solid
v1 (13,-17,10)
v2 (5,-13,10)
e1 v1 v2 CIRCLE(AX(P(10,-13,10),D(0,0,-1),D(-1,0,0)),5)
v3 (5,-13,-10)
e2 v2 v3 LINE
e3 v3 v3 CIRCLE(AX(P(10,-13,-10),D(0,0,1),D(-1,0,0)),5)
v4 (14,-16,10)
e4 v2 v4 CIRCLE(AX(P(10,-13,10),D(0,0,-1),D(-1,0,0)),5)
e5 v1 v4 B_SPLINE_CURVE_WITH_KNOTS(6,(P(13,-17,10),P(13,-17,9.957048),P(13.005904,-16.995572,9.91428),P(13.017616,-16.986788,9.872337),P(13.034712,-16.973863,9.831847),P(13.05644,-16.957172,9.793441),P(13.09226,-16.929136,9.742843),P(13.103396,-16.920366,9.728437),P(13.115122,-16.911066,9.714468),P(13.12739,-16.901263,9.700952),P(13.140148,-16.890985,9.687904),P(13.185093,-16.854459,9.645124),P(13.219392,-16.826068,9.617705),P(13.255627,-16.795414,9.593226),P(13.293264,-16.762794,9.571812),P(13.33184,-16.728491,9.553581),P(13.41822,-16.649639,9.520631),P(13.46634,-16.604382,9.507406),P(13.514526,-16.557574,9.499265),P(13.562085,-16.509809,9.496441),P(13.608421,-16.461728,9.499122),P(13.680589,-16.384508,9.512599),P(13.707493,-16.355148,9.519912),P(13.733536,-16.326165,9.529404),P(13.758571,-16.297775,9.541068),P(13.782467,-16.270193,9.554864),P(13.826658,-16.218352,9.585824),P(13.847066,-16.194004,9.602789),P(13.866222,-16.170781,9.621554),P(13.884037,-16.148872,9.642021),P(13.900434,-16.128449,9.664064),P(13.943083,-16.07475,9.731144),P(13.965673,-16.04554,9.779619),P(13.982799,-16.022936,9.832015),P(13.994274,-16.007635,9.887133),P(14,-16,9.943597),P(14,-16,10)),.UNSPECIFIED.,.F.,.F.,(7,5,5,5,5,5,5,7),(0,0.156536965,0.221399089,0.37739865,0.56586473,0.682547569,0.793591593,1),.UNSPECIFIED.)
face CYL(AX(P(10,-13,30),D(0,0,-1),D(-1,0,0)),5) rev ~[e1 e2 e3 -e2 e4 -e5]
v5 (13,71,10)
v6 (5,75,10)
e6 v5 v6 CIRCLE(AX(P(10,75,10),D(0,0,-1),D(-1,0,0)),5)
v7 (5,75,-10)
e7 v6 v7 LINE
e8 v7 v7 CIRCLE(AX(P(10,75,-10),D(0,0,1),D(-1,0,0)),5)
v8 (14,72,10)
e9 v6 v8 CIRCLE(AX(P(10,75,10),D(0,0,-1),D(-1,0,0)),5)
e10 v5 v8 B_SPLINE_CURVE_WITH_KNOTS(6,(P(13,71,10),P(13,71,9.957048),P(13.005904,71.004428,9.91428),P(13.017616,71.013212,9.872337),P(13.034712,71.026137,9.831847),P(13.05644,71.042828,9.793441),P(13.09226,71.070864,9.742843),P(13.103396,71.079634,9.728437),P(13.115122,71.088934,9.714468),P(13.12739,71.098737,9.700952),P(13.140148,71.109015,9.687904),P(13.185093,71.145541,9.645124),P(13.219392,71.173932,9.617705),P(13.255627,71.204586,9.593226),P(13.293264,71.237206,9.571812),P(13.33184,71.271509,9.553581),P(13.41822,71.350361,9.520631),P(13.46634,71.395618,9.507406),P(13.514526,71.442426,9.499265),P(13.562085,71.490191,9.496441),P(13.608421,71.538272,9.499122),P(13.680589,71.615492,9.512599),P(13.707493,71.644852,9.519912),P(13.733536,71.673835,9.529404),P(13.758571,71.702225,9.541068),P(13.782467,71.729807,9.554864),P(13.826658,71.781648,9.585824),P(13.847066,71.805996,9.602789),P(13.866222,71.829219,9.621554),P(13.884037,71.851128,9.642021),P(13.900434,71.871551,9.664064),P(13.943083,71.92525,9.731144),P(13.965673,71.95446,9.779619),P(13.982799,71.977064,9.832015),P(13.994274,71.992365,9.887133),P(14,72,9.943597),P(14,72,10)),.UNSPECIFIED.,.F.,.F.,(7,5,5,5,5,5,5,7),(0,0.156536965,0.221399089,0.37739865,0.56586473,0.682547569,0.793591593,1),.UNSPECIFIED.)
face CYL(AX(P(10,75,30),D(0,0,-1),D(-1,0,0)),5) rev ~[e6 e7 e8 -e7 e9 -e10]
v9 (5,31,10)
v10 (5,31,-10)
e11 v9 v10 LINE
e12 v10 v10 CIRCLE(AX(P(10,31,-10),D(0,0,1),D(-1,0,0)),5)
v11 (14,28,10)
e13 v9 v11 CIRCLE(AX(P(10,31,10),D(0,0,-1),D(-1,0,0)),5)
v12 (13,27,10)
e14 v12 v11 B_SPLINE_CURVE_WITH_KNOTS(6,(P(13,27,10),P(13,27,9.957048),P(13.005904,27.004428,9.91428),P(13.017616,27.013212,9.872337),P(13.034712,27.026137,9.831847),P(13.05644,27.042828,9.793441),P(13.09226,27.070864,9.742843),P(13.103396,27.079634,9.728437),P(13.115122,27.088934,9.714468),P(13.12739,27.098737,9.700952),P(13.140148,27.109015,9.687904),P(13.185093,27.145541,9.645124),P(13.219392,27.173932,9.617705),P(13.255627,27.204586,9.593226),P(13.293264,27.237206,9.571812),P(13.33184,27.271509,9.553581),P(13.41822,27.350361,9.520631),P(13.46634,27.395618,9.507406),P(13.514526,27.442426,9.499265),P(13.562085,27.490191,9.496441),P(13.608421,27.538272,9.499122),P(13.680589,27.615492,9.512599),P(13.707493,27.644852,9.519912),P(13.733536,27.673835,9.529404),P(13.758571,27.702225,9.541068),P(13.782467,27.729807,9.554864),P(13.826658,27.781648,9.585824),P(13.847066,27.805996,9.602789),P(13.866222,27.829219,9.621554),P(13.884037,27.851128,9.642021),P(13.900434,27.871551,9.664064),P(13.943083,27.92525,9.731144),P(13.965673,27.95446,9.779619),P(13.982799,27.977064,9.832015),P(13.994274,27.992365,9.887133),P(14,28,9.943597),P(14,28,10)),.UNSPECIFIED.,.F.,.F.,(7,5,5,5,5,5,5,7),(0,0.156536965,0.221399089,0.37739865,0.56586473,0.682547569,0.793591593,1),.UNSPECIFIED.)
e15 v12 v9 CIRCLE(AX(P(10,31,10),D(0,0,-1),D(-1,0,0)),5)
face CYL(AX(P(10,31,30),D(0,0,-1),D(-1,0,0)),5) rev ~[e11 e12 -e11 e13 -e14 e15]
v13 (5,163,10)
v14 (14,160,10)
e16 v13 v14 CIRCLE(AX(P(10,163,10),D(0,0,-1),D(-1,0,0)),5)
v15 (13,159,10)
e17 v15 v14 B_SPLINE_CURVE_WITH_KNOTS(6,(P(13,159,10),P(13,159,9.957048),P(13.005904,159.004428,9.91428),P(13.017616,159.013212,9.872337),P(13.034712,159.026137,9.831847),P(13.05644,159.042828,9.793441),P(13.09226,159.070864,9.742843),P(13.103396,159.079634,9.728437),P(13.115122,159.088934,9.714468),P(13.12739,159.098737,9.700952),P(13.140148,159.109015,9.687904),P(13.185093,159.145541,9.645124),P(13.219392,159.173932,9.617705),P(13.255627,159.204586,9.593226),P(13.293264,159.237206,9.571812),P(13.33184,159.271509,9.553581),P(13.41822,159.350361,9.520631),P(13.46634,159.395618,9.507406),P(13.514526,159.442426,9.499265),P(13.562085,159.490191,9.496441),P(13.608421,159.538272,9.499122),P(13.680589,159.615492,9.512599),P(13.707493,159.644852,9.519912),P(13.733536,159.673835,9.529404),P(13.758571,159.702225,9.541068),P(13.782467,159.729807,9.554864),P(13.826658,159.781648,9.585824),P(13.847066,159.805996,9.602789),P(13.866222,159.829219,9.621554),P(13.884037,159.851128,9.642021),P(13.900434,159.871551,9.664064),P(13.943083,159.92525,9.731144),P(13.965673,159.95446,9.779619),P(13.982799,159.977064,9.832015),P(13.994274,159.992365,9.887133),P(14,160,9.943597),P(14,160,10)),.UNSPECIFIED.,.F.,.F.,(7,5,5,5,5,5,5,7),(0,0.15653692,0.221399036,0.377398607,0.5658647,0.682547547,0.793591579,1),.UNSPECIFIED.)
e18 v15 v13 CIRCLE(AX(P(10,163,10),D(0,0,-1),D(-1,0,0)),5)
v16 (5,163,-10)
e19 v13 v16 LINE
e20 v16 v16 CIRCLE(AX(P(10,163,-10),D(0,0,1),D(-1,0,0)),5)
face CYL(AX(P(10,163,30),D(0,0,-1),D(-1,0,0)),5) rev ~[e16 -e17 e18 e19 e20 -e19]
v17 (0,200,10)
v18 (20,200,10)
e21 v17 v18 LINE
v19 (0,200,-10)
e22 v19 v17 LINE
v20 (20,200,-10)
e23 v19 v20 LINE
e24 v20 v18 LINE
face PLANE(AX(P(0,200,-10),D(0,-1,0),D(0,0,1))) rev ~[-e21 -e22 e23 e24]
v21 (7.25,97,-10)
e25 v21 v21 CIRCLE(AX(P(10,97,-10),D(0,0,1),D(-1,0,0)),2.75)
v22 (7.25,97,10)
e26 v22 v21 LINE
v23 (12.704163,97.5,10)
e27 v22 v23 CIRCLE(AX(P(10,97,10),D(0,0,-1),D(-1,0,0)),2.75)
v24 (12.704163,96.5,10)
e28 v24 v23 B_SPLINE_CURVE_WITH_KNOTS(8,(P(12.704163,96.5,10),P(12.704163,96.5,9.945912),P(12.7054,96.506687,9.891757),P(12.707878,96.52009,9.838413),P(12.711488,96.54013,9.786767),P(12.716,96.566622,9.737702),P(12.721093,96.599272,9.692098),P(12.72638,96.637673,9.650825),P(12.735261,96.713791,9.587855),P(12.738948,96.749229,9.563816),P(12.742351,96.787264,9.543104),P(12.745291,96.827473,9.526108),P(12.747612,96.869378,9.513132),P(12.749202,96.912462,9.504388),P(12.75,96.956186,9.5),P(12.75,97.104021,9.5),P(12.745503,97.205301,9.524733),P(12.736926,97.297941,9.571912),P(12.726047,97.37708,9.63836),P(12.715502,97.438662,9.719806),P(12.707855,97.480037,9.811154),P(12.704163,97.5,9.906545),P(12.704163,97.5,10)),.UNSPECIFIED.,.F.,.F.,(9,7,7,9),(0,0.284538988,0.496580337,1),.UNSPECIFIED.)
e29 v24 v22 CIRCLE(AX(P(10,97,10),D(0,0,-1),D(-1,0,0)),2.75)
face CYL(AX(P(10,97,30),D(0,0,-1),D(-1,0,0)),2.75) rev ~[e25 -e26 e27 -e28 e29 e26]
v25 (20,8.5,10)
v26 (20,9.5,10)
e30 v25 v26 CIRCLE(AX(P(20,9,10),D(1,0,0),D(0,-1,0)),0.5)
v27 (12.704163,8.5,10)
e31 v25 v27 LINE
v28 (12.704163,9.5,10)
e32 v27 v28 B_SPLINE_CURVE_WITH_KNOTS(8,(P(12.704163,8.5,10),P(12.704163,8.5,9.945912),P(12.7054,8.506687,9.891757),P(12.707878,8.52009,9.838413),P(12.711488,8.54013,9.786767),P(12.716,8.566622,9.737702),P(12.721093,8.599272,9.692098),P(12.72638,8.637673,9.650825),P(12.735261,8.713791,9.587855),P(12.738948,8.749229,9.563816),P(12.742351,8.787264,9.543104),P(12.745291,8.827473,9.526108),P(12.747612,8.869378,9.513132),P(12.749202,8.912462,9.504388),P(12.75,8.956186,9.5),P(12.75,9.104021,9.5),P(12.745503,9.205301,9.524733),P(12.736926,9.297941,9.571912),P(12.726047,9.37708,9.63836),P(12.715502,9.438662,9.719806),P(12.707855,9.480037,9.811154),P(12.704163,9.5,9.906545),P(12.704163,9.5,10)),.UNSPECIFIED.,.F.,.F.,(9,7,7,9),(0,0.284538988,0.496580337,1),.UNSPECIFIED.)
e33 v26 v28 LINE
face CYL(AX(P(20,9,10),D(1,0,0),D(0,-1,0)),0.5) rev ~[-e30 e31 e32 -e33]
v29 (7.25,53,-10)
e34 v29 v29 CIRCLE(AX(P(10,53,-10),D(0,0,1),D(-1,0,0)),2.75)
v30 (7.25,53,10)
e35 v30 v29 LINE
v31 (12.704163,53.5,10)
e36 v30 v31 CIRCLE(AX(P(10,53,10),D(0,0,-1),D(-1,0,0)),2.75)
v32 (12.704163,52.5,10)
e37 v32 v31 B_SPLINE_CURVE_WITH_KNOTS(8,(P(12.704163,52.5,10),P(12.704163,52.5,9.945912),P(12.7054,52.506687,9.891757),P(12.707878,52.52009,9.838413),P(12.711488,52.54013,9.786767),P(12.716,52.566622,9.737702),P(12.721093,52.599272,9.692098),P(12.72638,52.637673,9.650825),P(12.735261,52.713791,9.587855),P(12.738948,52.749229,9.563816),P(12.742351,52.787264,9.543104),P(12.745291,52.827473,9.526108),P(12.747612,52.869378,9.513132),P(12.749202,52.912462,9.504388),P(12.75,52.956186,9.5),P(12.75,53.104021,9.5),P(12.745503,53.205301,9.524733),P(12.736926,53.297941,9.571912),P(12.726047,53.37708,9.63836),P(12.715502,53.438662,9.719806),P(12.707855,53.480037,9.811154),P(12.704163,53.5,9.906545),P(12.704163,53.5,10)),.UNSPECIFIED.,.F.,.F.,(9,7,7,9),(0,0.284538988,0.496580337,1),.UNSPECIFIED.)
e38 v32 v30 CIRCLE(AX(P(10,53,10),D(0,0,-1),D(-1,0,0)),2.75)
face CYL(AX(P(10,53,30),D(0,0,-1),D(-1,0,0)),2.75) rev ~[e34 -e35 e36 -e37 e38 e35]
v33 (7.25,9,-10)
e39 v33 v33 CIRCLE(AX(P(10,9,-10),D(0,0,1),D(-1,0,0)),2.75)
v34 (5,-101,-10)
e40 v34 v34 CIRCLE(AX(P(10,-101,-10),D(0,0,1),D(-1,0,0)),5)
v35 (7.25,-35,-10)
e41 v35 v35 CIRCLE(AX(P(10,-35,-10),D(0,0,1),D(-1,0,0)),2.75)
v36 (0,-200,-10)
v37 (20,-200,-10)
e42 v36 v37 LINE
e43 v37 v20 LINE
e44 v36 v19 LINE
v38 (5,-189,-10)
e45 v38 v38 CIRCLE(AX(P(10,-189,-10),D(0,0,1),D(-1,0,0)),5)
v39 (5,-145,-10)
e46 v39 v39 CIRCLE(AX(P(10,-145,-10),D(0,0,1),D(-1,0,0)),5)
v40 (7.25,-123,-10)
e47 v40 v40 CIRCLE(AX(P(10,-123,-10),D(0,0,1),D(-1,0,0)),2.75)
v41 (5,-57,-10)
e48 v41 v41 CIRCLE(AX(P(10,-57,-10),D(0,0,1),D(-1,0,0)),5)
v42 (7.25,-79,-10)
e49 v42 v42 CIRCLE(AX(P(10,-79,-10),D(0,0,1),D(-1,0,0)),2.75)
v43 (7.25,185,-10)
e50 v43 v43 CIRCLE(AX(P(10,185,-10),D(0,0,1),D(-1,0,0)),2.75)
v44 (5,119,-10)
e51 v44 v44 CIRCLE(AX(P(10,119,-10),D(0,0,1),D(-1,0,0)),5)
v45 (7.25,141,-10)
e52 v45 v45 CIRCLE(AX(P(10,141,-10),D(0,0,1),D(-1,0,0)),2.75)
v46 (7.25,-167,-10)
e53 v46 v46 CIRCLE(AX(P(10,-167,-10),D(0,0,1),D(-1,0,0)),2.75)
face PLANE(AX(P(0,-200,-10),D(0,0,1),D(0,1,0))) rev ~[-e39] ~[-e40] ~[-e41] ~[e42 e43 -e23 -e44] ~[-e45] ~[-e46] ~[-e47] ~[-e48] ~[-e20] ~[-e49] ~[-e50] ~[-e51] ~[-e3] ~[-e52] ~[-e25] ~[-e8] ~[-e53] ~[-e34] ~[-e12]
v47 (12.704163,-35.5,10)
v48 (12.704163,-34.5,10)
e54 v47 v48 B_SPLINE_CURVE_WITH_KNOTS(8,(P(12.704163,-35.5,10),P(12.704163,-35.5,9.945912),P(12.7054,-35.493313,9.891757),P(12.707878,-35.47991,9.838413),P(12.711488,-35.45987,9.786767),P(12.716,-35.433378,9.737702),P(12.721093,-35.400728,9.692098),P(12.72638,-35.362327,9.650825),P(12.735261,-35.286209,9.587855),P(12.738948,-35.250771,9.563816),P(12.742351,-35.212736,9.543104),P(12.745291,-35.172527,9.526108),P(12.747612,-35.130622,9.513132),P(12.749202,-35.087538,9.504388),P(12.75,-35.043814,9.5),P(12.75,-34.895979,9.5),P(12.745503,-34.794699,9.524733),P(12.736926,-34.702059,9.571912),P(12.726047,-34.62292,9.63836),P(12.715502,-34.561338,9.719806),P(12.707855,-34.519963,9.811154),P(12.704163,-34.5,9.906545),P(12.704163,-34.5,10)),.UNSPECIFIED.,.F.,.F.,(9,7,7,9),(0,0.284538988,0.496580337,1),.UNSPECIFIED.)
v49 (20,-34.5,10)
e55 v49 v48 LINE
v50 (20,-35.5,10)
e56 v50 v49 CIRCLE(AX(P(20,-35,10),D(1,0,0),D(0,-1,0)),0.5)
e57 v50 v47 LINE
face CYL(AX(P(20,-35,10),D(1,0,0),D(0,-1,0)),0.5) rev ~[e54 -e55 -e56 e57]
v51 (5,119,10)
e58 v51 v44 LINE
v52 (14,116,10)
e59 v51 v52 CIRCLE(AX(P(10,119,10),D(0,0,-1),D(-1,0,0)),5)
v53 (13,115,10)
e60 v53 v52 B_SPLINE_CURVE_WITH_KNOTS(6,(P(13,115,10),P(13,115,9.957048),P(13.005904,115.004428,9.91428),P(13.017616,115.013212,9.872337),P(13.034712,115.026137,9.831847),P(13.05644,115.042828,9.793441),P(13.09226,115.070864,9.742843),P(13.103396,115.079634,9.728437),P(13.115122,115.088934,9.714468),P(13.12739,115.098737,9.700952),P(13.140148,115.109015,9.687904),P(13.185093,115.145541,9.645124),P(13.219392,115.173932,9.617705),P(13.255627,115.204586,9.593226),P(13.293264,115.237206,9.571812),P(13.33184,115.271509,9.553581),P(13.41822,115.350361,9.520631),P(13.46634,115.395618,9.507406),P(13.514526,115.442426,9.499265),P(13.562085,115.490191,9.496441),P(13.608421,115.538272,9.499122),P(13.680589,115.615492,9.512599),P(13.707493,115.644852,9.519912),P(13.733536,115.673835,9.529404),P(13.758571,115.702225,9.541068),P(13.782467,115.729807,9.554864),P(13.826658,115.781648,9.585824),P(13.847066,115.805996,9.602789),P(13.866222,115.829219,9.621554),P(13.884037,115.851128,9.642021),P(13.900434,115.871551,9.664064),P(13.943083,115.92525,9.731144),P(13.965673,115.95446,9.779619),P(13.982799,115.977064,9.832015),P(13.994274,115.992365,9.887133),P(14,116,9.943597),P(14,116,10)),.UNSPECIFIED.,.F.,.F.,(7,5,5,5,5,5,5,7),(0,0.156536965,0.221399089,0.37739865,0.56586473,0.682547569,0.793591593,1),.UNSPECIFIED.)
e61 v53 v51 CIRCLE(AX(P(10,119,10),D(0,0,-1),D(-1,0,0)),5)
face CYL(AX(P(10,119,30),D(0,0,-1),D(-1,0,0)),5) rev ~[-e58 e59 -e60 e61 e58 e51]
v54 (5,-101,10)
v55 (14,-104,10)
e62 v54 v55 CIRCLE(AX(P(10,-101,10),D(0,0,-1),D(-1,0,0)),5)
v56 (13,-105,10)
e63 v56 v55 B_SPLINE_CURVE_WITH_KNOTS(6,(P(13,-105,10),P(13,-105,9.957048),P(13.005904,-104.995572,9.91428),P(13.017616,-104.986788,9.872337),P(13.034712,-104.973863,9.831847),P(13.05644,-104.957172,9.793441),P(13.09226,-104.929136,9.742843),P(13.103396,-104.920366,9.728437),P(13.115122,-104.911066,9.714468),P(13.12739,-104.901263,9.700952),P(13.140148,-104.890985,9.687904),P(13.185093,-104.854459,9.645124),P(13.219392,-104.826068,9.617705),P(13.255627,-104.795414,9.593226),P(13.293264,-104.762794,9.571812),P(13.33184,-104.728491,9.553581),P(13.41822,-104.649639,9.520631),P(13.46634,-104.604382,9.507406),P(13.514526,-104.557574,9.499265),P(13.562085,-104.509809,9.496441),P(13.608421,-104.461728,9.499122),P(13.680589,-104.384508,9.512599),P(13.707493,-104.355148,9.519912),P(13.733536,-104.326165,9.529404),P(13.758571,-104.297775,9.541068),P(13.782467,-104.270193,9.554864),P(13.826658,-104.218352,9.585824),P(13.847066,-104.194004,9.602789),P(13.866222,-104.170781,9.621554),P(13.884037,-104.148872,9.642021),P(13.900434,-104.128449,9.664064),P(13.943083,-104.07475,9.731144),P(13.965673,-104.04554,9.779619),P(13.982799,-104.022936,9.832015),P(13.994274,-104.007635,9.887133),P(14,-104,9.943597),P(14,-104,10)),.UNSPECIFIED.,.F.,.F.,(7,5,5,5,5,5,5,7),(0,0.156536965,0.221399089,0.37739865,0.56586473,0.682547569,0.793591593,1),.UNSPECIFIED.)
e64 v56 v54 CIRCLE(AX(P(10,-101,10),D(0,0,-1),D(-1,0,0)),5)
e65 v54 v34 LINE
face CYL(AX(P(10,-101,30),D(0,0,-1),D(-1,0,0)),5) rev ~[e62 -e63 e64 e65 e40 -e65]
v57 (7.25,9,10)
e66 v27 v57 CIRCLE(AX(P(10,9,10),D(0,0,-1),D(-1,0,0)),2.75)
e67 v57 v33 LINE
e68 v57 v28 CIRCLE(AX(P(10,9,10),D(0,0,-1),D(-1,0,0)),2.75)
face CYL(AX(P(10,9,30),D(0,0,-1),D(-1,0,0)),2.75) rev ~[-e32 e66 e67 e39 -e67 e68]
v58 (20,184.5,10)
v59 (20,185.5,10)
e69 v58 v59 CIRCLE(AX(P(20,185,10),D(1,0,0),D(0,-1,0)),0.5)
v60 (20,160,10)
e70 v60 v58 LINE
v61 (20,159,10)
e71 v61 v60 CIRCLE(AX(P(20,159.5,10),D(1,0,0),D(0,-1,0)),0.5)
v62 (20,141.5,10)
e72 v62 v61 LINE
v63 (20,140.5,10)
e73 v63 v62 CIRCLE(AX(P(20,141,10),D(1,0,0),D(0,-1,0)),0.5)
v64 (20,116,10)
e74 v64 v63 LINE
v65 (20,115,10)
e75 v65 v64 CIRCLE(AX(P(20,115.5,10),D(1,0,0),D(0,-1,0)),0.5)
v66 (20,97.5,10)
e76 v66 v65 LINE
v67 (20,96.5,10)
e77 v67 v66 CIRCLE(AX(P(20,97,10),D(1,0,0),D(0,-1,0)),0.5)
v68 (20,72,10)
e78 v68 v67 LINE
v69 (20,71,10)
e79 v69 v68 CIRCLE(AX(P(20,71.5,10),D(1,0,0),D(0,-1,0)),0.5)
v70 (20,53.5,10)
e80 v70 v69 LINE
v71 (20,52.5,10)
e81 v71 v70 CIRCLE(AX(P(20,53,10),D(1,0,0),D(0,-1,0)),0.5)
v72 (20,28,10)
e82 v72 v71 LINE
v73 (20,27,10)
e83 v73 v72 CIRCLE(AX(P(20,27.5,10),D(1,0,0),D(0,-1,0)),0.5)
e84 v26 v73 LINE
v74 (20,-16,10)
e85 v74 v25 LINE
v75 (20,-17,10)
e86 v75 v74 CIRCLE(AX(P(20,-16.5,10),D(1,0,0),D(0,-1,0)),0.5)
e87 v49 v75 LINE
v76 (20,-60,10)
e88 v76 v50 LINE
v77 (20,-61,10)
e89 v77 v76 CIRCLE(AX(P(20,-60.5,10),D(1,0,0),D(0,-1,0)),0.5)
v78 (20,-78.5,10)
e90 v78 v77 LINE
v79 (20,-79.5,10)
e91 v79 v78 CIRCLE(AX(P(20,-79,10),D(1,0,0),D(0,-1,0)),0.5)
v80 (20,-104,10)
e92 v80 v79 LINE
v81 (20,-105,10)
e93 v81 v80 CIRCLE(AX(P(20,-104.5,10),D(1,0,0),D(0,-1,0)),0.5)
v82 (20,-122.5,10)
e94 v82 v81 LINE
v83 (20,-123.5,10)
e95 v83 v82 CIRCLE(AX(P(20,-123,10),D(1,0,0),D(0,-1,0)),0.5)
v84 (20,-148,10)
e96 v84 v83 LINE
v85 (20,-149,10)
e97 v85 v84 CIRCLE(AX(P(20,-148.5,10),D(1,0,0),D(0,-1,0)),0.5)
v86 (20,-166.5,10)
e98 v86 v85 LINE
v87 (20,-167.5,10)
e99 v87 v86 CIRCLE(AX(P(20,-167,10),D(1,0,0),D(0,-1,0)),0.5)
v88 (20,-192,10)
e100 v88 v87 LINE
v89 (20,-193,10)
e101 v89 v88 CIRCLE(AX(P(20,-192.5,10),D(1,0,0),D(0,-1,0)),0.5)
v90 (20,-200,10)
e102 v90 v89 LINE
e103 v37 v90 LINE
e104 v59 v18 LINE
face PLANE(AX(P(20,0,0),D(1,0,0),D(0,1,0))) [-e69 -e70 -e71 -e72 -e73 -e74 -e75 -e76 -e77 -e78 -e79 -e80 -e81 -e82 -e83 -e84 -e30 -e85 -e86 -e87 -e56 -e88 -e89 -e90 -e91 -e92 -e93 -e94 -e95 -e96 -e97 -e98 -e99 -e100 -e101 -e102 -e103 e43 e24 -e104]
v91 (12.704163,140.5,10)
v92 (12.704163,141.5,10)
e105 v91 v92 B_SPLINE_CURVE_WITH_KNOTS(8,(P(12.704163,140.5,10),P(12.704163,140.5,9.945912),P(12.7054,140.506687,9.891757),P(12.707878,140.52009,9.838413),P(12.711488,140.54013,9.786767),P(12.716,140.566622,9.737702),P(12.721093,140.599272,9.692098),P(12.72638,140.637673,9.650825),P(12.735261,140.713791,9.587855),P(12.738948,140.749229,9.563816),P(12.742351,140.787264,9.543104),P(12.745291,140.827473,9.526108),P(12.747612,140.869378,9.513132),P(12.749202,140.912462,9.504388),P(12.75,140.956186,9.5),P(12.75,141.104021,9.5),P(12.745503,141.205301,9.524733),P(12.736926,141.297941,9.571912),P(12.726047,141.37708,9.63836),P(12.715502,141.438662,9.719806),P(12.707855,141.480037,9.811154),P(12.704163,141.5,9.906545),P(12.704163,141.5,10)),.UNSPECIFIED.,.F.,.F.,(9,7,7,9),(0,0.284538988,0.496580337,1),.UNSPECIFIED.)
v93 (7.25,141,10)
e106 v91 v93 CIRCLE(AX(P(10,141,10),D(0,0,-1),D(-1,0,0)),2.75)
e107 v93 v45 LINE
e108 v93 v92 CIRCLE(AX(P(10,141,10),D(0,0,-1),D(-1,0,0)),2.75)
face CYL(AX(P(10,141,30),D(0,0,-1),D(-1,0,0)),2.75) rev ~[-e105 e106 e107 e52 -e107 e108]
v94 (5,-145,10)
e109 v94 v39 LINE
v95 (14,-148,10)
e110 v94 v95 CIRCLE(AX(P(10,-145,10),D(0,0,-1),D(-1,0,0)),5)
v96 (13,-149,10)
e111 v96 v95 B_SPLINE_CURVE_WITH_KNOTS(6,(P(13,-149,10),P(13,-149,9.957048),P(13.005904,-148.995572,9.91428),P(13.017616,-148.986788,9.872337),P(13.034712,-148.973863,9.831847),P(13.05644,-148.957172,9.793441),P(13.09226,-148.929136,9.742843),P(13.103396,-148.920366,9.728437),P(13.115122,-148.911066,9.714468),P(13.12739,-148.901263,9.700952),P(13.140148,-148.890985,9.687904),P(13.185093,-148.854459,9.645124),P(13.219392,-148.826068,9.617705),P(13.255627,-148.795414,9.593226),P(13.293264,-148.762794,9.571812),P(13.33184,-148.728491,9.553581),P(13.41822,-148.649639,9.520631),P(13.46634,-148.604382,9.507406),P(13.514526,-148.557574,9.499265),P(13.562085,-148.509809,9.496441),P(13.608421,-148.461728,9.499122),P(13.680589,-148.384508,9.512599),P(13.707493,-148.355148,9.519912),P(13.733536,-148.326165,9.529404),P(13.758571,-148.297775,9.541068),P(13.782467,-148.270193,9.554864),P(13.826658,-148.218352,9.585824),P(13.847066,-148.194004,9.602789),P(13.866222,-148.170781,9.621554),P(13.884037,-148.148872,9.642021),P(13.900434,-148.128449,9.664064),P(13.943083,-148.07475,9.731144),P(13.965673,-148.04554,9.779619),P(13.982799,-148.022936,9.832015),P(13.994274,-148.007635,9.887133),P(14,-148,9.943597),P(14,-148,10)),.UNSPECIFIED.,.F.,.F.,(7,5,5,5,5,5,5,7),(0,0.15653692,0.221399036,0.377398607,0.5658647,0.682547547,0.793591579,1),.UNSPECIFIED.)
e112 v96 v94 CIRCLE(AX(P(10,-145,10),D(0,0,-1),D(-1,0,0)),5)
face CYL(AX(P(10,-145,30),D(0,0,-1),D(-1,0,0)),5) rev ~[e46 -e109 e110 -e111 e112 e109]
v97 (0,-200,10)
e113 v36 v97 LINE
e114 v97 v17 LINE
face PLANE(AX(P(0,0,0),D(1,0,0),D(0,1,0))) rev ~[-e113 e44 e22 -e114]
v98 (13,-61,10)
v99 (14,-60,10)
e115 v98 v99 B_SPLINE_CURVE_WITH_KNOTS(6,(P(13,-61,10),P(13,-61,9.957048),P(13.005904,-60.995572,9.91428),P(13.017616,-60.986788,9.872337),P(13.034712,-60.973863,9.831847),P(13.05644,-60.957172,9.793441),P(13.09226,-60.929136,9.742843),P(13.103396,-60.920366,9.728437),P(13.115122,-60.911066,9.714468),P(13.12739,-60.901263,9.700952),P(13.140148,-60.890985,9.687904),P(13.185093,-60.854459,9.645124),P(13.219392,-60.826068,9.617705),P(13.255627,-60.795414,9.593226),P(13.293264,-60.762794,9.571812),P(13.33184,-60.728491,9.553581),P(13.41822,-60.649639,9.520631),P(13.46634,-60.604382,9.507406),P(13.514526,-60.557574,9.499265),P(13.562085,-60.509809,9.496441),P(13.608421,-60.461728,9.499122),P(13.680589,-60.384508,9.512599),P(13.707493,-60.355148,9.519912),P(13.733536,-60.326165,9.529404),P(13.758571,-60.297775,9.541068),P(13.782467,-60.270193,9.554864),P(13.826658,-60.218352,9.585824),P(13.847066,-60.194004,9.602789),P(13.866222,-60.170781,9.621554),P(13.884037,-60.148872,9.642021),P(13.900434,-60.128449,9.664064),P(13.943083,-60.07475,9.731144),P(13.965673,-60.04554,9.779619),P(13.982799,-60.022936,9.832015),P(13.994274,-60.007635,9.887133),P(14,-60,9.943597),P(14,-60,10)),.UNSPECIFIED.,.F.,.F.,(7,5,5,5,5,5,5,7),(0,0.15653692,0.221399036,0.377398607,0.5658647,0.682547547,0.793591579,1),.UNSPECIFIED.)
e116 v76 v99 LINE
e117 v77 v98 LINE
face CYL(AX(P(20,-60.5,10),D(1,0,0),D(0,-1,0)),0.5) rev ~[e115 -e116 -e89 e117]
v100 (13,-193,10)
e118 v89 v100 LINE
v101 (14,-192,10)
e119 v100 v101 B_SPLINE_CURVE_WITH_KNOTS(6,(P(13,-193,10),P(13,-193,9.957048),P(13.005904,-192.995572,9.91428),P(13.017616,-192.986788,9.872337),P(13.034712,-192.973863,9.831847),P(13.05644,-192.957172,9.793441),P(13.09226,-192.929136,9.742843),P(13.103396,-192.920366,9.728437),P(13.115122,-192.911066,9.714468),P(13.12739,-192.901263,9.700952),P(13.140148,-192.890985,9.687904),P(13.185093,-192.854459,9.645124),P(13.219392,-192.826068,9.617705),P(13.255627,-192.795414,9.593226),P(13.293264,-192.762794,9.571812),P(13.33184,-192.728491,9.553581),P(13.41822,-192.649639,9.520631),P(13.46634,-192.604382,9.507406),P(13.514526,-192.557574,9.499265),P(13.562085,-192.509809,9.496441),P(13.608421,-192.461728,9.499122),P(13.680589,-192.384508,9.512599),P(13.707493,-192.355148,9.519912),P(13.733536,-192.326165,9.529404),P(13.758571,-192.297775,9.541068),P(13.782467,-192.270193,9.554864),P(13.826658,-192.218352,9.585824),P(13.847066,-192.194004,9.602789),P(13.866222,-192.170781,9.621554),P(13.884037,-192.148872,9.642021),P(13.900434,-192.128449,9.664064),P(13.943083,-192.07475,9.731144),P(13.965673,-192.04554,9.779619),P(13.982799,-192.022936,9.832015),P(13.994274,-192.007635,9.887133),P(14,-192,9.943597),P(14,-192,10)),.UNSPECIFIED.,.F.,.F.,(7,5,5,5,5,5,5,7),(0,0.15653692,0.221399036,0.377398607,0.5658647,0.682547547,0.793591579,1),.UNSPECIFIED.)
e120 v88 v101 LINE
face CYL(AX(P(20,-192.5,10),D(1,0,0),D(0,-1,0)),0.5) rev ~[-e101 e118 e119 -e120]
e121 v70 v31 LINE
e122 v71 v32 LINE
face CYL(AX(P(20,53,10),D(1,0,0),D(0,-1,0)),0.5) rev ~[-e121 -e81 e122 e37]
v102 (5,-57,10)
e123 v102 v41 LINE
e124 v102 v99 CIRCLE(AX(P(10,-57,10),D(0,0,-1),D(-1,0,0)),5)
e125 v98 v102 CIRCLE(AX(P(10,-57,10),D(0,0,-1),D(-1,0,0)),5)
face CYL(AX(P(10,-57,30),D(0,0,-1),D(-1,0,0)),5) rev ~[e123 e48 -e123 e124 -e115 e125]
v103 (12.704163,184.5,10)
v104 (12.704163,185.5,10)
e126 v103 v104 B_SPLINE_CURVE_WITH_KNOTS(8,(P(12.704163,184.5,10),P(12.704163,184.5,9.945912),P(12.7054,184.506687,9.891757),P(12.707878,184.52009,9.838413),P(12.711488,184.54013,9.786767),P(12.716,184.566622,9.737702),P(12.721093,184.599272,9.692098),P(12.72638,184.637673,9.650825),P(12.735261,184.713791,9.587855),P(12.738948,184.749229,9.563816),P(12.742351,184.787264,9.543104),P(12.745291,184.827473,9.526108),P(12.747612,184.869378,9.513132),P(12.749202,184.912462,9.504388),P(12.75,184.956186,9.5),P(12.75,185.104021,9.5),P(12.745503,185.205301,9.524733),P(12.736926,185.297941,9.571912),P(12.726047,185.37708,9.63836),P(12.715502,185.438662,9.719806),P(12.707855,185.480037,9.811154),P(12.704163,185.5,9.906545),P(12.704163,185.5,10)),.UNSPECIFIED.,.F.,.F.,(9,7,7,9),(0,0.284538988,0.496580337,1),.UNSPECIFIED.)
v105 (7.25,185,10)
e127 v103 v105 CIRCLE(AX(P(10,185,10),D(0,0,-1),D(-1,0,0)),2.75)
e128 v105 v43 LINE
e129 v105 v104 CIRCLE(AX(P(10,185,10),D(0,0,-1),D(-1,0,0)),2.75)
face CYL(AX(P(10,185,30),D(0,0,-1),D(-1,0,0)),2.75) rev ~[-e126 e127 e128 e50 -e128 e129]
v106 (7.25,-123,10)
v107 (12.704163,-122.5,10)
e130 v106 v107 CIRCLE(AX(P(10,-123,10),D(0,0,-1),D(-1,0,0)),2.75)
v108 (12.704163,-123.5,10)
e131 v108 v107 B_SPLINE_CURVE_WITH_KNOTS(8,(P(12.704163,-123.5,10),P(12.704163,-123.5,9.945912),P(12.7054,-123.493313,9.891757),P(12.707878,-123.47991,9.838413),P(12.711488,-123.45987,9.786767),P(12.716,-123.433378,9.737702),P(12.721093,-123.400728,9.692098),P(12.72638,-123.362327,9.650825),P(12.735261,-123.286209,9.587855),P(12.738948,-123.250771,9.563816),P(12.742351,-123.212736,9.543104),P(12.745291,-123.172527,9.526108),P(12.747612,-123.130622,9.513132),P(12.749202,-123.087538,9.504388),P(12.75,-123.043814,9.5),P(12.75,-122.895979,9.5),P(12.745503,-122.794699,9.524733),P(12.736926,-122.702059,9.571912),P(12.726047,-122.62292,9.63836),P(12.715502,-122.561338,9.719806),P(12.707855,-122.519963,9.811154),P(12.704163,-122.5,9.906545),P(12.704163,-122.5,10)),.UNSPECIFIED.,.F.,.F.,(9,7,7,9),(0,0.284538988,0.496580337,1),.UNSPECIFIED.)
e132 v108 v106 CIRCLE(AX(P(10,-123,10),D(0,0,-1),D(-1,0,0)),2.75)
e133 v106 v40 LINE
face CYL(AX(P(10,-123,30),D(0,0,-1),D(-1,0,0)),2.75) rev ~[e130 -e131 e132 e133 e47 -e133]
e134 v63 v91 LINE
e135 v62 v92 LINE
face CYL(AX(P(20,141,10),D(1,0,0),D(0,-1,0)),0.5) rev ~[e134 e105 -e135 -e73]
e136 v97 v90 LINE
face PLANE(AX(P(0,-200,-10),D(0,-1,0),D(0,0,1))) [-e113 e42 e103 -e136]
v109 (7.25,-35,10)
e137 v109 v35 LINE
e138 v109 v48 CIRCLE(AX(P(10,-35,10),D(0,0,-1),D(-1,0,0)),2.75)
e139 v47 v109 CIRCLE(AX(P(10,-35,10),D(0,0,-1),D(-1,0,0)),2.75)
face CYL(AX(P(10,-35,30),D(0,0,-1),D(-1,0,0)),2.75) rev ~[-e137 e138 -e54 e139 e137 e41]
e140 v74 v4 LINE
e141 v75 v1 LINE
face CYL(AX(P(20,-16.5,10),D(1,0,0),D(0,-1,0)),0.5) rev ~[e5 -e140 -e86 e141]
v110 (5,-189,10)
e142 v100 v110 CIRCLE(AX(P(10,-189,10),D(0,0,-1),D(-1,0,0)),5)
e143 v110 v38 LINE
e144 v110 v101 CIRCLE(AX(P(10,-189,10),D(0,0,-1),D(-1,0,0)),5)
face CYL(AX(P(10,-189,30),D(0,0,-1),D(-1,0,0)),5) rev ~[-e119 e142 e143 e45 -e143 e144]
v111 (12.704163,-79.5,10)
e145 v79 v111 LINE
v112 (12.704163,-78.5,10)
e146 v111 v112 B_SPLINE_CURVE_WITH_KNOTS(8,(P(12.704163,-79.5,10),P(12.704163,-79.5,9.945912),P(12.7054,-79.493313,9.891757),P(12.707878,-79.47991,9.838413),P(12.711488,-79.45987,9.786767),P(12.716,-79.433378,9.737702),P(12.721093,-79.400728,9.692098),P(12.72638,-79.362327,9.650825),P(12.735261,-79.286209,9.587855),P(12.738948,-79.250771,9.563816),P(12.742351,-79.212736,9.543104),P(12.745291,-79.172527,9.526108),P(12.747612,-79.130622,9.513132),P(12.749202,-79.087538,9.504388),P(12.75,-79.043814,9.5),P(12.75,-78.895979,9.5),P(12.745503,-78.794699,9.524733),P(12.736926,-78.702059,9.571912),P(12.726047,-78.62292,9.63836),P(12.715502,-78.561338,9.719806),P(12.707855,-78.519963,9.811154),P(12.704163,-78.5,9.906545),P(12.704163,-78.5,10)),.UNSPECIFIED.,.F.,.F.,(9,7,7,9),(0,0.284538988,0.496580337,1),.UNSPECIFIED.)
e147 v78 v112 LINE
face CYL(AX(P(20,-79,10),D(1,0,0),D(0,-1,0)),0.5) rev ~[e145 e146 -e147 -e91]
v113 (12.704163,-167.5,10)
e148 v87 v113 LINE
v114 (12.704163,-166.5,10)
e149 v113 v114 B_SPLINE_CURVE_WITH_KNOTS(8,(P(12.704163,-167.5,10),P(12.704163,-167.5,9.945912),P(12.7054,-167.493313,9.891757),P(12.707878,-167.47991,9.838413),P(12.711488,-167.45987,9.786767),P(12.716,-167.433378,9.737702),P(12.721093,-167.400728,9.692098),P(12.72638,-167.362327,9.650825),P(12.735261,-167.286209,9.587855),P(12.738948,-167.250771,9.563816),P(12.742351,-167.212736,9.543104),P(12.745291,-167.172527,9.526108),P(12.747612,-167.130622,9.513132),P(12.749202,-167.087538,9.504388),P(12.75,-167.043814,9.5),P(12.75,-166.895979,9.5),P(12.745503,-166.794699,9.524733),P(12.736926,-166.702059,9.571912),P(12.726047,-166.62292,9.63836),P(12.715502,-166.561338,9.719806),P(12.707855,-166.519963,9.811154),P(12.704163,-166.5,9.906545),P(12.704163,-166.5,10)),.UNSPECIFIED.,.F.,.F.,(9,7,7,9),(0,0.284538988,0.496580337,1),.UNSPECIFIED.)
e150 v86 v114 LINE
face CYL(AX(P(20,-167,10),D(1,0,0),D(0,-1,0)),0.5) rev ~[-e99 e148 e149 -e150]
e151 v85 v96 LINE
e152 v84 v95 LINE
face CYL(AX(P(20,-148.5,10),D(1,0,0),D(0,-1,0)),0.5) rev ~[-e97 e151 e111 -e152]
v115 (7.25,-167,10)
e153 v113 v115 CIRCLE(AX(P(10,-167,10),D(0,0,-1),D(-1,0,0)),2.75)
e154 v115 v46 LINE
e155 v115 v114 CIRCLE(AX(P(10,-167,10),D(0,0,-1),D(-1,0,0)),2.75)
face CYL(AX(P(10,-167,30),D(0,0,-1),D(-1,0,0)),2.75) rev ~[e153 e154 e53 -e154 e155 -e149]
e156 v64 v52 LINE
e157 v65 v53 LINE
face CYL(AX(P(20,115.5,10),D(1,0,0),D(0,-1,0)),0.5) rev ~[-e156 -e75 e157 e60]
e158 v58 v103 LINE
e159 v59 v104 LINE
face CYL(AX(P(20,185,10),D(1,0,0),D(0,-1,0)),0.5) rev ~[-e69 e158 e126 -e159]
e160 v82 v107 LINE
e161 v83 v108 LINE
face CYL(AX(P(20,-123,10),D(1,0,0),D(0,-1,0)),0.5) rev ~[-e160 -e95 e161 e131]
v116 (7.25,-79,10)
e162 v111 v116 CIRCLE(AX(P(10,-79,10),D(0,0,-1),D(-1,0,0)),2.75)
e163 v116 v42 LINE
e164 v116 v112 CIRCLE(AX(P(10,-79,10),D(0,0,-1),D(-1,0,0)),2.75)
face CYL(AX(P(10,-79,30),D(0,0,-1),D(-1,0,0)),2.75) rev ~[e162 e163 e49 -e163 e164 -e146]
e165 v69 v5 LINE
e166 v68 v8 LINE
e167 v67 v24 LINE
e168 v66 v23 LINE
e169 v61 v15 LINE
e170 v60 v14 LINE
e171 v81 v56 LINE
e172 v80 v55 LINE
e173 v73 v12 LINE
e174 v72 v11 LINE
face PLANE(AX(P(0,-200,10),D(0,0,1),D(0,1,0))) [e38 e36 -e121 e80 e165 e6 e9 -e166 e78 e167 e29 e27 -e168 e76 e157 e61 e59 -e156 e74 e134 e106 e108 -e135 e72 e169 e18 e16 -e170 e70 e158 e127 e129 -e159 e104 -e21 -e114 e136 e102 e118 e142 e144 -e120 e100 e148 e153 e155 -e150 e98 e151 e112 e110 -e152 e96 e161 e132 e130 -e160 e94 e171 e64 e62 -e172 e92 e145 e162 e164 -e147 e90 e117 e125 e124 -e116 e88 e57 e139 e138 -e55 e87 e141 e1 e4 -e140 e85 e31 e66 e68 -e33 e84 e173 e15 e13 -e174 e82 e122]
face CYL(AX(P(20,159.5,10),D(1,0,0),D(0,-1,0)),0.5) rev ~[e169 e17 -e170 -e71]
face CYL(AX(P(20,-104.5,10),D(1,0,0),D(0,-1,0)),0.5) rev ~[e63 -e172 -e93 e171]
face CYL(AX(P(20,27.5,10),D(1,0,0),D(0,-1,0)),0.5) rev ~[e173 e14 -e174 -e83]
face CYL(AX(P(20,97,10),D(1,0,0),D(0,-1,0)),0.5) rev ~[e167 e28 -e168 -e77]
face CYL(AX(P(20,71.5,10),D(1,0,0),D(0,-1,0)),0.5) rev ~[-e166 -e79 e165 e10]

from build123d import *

# Parameters (mm, degrees)
F0_W     = 400
F0_H     = 20
F1_DEPTH = 20
F3_D     = 5.5
F3_DEPTH = 20
F3_TIP   = 1.6523667023
F5_D     = 10
F5_DEPTH = 20
F5_TIP   = 3.0043030951
F7_DEPTH = 10


# Not quite as in the source:
# - a feature names something its author has since deleted; it is built from what else it names


with BuildPart() as f1:
    # F0 (on Right) → F1 (new body)
    with BuildSketch(Plane.YZ):
        Rectangle(F0_W, F0_H)
    extrude(amount=F1_DEPTH)

    # F3
    with Locations(Plane.XY.offset(10)):
        with Locations((10, 185), (10, 141), (10, 97), (10, -167), (10, -123), (10, -79), (10, -35), (10, 9), (10, 53)):
            Hole(F3_D / 2, depth=F3_DEPTH)
            with Locations((0, 0, -(F3_DEPTH + F3_TIP / 2))):  # 118° drill point
                Cone(0, F3_D / 2, F3_TIP, mode=Mode.SUBTRACT)

    # F5
    with Locations(Plane.XY.offset(10)):
        with Locations((10, 163), (10, 119), (10, 75), (10, -189), (10, -145), (10, -101), (10, -57), (10, -13), (10, 31)):
            Hole(F5_D / 2, depth=F5_DEPTH)
            with Locations((0, 0, -(F5_DEPTH + F5_TIP / 2))):  # 118° drill point
                Cone(0, F5_D / 2, F5_TIP, mode=Mode.SUBTRACT)

    # F6 (on face) → F7 (cut)
    with BuildSketch(Plane.YZ.offset(20)):
        with BuildLine():
            ThreePointArc((71, 10), (71.5, 9.5), (72, 10))
            Line((72, 10), (71, 10))
        make_face()
        with BuildLine():
            ThreePointArc((96.5, 10), (97, 9.5), (97.5, 10))
            Line((97.5, 10), (96.5, 10))
        make_face()
        with BuildLine():
            ThreePointArc((115, 10), (115.5, 9.5), (116, 10))
            Line((116, 10), (115, 10))
        make_face()
        with BuildLine():
            ThreePointArc((140.5, 10), (141, 9.5), (141.5, 10))
            Line((141.5, 10), (140.5, 10))
        make_face()
        with BuildLine():
            ThreePointArc((159, 10), (159.5, 9.5), (160, 10))
            Line((160, 10), (159, 10))
        make_face()
        with BuildLine():
            Line((185.5, 10), (184.5, 10))
            ThreePointArc((184.5, 10), (185, 9.5), (185.5, 10))
        make_face()
        with BuildLine():
            ThreePointArc((52.5, 10), (53, 9.5), (53.5, 10))
            Line((53.5, 10), (52.5, 10))
        make_face()
        with BuildLine():
            ThreePointArc((27, 10), (27.5, 9.5), (28, 10))
            Line((28, 10), (27, 10))
        make_face()
        with BuildLine():
            ThreePointArc((8.5, 10), (9, 9.5), (9.5, 10))
            Line((9.5, 10), (8.5, 10))
        make_face()
        with BuildLine():
            ThreePointArc((-17, 10), (-16.5, 9.5), (-16, 10))
            Line((-16, 10), (-17, 10))
        make_face()
        with BuildLine():
            ThreePointArc((-35.5, 10), (-35, 9.5), (-34.5, 10))
            Line((-34.5, 10), (-35.5, 10))
        make_face()
        with BuildLine():
            Line((-60, 10), (-61, 10))
            ThreePointArc((-61, 10), (-60.5, 9.5), (-60, 10))
        make_face()
        with BuildLine():
            Line((-78.5, 10), (-79.5, 10))
            ThreePointArc((-79.5, 10), (-79, 9.5), (-78.5, 10))
        make_face()
        with BuildLine():
            Line((-104, 10), (-105, 10))
            ThreePointArc((-105, 10), (-104.5, 9.5), (-104, 10))
        make_face()
        with BuildLine():
            Line((-122.5, 10), (-123.5, 10))
            ThreePointArc((-123.5, 10), (-123, 9.5), (-122.5, 10))
        make_face()
        with BuildLine():
            Line((-148, 10), (-149, 10))
            ThreePointArc((-149, 10), (-148.5, 9.5), (-148, 10))
        make_face()
        with BuildLine():
            Line((-166.5, 10), (-167.5, 10))
            ThreePointArc((-167.5, 10), (-167, 9.5), (-166.5, 10))
        make_face()
        with BuildLine():
            Line((-192, 10), (-193, 10))
            ThreePointArc((-193, 10), (-192.5, 9.5), (-192, 10))
        make_face()
    extrude(amount=-F7_DEPTH, mode=Mode.SUBTRACT)


solid = f1.part
